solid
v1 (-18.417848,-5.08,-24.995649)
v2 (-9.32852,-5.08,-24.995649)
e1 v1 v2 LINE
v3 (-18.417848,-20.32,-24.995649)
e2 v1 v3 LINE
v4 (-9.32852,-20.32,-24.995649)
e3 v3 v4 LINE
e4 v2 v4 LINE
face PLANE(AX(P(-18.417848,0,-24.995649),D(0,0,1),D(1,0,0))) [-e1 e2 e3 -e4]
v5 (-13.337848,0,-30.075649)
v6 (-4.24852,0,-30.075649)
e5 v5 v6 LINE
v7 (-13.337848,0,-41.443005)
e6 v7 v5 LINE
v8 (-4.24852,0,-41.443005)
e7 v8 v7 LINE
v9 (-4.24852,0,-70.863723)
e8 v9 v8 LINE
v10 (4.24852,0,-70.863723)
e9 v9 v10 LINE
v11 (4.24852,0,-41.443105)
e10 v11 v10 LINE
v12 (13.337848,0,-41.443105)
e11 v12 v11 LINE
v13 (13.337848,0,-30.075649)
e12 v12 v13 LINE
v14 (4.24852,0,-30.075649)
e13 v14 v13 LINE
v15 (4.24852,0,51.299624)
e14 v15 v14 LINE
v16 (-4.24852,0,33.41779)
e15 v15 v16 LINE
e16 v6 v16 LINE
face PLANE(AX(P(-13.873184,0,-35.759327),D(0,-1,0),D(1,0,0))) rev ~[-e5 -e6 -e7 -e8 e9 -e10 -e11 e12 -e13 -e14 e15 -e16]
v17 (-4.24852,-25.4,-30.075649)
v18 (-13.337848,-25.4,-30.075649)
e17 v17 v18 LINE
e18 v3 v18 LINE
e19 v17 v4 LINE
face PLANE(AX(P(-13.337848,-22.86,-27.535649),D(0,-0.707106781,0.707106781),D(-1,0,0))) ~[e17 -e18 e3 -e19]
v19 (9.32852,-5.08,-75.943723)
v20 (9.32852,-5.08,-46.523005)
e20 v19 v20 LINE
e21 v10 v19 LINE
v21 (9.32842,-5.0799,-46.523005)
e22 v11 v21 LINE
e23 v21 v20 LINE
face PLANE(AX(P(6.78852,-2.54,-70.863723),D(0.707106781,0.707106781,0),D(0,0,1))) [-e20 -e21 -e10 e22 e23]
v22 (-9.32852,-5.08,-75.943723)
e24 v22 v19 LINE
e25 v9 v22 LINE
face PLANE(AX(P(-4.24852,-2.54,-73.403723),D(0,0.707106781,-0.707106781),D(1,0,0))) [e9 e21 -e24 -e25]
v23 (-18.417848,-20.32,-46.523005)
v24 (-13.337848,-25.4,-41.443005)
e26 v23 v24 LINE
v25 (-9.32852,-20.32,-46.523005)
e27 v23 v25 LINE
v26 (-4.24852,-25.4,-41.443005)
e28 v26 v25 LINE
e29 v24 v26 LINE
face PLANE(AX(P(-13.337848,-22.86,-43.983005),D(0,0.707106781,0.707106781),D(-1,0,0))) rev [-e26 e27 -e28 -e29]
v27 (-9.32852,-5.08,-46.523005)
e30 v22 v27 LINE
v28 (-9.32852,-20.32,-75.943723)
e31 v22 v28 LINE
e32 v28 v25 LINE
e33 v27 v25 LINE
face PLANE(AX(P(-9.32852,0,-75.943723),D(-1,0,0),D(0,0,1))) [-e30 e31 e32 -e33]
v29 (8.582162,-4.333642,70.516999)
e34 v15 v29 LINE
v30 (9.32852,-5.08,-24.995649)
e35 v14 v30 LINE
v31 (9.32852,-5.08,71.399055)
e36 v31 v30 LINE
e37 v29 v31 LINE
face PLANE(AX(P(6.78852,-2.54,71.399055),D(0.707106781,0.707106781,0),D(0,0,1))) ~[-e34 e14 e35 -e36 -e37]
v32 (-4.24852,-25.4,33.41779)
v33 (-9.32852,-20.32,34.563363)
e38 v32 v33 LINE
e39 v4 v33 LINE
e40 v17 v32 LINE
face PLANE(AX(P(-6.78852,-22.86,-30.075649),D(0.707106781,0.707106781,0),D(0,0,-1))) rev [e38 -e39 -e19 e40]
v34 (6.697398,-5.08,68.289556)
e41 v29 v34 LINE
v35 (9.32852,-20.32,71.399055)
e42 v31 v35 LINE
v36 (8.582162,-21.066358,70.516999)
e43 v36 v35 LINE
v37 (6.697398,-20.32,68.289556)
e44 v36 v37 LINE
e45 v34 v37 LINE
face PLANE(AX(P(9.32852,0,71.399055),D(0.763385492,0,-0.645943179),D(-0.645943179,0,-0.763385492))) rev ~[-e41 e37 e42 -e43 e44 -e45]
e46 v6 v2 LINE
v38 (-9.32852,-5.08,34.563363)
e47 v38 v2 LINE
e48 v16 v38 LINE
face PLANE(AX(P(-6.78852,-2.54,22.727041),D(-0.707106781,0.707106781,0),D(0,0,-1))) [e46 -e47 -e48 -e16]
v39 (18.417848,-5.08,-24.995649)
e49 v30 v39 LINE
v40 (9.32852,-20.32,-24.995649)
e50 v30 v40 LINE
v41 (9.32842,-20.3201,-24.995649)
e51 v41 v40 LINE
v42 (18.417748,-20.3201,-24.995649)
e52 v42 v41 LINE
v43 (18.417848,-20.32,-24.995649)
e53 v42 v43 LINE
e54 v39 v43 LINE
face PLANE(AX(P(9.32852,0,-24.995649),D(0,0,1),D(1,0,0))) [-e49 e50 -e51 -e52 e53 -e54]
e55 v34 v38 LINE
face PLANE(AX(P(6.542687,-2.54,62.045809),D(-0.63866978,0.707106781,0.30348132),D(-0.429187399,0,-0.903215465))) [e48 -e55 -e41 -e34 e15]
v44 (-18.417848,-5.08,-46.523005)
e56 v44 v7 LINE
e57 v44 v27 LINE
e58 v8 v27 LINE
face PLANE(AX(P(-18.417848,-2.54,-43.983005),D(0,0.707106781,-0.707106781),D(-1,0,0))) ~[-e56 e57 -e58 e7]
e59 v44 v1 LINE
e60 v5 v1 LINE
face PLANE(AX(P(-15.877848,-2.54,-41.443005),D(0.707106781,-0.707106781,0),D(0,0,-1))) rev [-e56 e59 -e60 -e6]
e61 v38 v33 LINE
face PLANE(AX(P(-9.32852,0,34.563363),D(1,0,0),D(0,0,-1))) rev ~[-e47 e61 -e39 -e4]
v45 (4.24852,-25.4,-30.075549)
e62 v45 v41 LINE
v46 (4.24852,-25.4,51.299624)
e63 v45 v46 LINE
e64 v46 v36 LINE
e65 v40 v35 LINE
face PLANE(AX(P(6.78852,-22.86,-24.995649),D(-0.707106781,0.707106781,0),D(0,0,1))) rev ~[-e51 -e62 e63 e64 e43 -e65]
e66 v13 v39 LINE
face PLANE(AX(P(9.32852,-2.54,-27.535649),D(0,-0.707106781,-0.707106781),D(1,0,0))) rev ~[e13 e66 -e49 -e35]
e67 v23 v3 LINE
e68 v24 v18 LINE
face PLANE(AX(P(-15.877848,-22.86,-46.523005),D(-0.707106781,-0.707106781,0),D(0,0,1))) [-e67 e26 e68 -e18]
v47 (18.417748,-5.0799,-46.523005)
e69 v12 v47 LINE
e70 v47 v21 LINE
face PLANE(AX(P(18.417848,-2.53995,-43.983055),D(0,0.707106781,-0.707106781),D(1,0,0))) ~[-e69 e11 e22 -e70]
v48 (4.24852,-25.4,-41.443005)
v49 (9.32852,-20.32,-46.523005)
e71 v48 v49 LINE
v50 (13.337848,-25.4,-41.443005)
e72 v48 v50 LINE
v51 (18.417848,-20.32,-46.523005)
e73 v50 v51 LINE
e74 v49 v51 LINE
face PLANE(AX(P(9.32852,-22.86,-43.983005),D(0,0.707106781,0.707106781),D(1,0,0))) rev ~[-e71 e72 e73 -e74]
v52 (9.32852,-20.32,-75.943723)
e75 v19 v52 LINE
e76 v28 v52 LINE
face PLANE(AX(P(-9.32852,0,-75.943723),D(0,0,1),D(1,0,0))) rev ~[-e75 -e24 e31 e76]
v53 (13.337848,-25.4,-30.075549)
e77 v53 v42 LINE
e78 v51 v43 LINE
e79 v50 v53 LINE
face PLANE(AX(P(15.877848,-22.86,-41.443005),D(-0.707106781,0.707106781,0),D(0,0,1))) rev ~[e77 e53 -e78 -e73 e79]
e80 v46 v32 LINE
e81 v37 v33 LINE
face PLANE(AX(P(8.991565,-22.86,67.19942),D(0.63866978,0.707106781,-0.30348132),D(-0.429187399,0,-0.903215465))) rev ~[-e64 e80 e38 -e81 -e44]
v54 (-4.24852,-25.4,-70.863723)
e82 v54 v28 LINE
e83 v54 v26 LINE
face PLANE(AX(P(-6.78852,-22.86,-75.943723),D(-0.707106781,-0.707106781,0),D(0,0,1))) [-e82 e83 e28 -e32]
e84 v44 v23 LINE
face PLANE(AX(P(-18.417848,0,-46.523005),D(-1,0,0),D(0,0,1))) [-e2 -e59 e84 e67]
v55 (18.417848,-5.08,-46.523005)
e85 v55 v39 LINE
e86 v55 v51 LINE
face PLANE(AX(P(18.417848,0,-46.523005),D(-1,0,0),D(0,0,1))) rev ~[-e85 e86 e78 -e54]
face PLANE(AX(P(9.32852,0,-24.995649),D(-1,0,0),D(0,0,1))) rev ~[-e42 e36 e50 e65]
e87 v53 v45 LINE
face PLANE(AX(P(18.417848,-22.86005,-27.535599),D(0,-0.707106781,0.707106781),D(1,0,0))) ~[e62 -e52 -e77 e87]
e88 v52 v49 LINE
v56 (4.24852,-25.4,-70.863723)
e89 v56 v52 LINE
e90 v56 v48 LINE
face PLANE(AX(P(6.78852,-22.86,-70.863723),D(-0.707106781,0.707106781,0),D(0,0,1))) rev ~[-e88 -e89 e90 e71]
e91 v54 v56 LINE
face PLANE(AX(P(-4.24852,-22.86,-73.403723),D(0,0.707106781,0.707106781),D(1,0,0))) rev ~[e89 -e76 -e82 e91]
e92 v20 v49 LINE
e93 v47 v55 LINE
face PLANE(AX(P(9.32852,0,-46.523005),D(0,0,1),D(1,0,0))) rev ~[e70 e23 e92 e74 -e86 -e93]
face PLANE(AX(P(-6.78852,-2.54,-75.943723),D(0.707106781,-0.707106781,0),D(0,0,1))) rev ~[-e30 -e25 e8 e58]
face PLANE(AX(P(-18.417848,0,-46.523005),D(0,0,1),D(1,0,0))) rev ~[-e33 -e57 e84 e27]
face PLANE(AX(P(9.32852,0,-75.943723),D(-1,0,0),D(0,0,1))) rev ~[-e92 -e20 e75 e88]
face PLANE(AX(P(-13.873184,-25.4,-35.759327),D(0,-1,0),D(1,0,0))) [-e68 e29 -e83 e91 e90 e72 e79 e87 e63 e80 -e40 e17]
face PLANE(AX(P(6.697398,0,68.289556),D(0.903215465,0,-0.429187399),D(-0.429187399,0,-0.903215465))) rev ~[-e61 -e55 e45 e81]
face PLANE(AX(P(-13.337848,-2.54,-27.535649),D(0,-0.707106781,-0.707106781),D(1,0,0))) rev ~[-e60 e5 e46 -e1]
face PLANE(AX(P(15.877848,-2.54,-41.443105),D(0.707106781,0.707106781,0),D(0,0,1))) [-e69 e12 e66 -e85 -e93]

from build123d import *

# Parameters (mm, degrees)
F0_W        = 9.0893283486
F0_H        = 21.5273555368
F0_W_2      = 9.3285199255
F0_H_2      = 29.4207185507
F1_DEPTH    = 25.4
F2_R        = 9.5587418967
F3_DEPTH    = 25.4
F4_C1_SIZE  = 5.08
F4_C2_SIZE  = 5.08
F4_C3_SIZE  = 5.08
F4_C4_SIZE  = 5.08
F4_C5_SIZE  = 5.08
F4_C6_SIZE  = 5.0799
F4_C7_SIZE  = 5.08
F4_C8_SIZE  = 5.08
F4_C9_SIZE  = 5.08
F4_C10_SIZE = 5.08
F4_C11_SIZE = 5.08
F4_C12_SIZE = 5.08
F5_C1_SIZE  = 5.08
F5_C2_SIZE  = 5.08
F5_C3_SIZE  = 5.08
F5_C4_SIZE  = 5.08
F5_C5_SIZE  = 5.08
F5_C6_SIZE  = 5.08
F5_C7_SIZE  = 5.08
F5_C8_SIZE  = 5.08
F5_C9_SIZE  = 5.08
F5_C10_SIZE = 5.08
F5_C11_SIZE = 5.0799
F5_C12_SIZE = 5.08


# Not quite as in the source:
# - a fillet or chamfer is up to 0.001 mm smaller than in the source, because OpenCascade refuses the exact size


with BuildPart() as f1:
    # F0 (on Front) → F1 (new body)
    with BuildSketch(Plane.XZ):
        with Locations((-13.8731840998, -35.7593270019)):
            Rectangle(F0_W, F0_H)
        Polygon((-9.3285199255, -24.9956492335), (-9.3285199255, -46.5230047703), (0, -46.5230047703), (9.3285199255, -46.5230047703), (9.3285199255, -24.9956492335), (9.3285199255, 34.5633625984), (9.3285199255, 71.3990554214), (6.6973981448, 68.2895556092), (-9.3285199255, 34.5633625984), align=None)
        with Locations((13.8731840998, -35.7593270019)):
            Rectangle(F0_W, F0_H)
        with Locations((-4.6642599627, -61.2333640456)):
            Rectangle(F0_W_2, F0_H_2)
        with Locations((4.6642599627, -61.2333640456)):
            Rectangle(F0_W_2, F0_H_2)
    extrude(amount=F1_DEPTH)

    # F2 (on Front) → F3 (join)
    with BuildSketch(Plane.XZ):
        with Locations((0, -37.1944867074)):
            Circle(F2_R)
    extrude(amount=F3_DEPTH)

    # F4: chamfer of 5.08 on 13 edges, made by hand

    # F4_c1
    f4_c1_edges = [f1.edges().sort_by_distance(p)[0] for p in [
        (-13.8731840998, 0, -46.5230047703),
    ]]
    chamfer(f4_c1_edges, length=F4_C1_SIZE)

    # F4_c2
    f4_c2_edges = [f1.edges().sort_by_distance(p)[0] for p in [
        (-18.4178482741, 0, -33.2193270019),
    ]]
    chamfer(f4_c2_edges, length=F4_C2_SIZE)

    # F4_c3
    f4_c3_edges = [f1.edges().sort_by_distance(p)[0] for p in [
        (-9.3285199255, 0, -61.2333640456),
    ]]
    chamfer(f4_c3_edges, length=F4_C3_SIZE)

    # F4_c4
    f4_c4_edges = [f1.edges().sort_by_distance(p)[0] for p in [
        (2.54, 0, -75.943723321),
    ]]
    chamfer(f4_c4_edges, length=F4_C4_SIZE)

    # F4_c5
    f4_c5_edges = [f1.edges().sort_by_distance(p)[0] for p in [
        (9.3285199255, 0, -58.6933640456),
    ]]
    chamfer(f4_c5_edges, length=F4_C5_SIZE)

    # F4_c6 (size 5.08 in the source; OpenCascade refuses exactly that, so slightly less here)
    f4_c6_edges = [f1.edges().sort_by_distance(p)[0] for p in [
        (13.8731840998, 0, -46.5230047703),
    ]]
    chamfer(f4_c6_edges, length=F4_C6_SIZE)

    # F4_c7
    f4_c7_edges = [f1.edges().sort_by_distance(p)[0] for p in [
        (18.4178482741, 0, -33.2193770019),
    ]]
    chamfer(f4_c7_edges, length=F4_C7_SIZE)

    # F4_c8
    f4_c8_edges = [f1.edges().sort_by_distance(p)[0] for p in [
        (11.3331840998, 0, -24.9956492335),
    ]]
    chamfer(f4_c8_edges, length=F4_C8_SIZE)

    # F4_c9
    f4_c9_edges = [f1.edges().sort_by_distance(p)[0] for p in [
        (9.3285199255, 0, 23.2017030939),
    ]]
    chamfer(f4_c9_edges, length=F4_C9_SIZE)

    # F4_c10
    f4_c10_edges = [f1.edges().sort_by_distance(p)[0] for p in [
        (-2.54, 0, 48.8496538587),
    ]]
    chamfer(f4_c10_edges, length=F4_C10_SIZE)

    # F4_c11
    f4_c11_edges = [f1.edges().sort_by_distance(p)[0] for p in [
        (-9.3285199255, 0, -1.1343040268),
    ]]
    chamfer(f4_c11_edges, length=F4_C11_SIZE)

    # F4_c12
    f4_c12_edges = [f1.edges().sort_by_distance(p)[0] for p in [
        (-11.3331840998, 0, -24.9956492335),
    ]]
    chamfer(f4_c12_edges, length=F4_C12_SIZE)

    # F5: chamfer of 5.08 on 13 edges, made by hand

    # F5_c1
    f5_c1_edges = [f1.edges().sort_by_distance(p)[0] for p in [
        (-18.4178482741, -25.4, -35.7593270019),
    ]]
    chamfer(f5_c1_edges, length=F5_C1_SIZE)

    # F5_c2
    f5_c2_edges = [f1.edges().sort_by_distance(p)[0] for p in [
        (-11.3331840998, -25.4, -24.9956492335),
    ]]
    chamfer(f5_c2_edges, length=F5_C2_SIZE)

    # F5_c3
    f5_c3_edges = [f1.edges().sort_by_distance(p)[0] for p in [
        (-11.3331840998, -25.4, -46.5230047703),
    ]]
    chamfer(f5_c3_edges, length=F5_C3_SIZE)

    # F5_c4
    f5_c4_edges = [f1.edges().sort_by_distance(p)[0] for p in [
        (-9.3285199255, -25.4, 4.7838566825),
    ]]
    chamfer(f5_c4_edges, length=F5_C4_SIZE)

    # F5_c5
    f5_c5_edges = [f1.edges().sort_by_distance(p)[0] for p in [
        (-9.3285199255, -25.4, -61.2333640456),
    ]]
    chamfer(f5_c5_edges, length=F5_C5_SIZE)

    # F5_c6
    f5_c6_edges = [f1.edges().sort_by_distance(p)[0] for p in [
        (1.2244391096, -25.4, 56.7718333827),
    ]]
    chamfer(f5_c6_edges, length=F5_C6_SIZE)

    # F5_c7
    f5_c7_edges = [f1.edges().sort_by_distance(p)[0] for p in [
        (2.54, -25.4, -75.943723321),
    ]]
    chamfer(f5_c7_edges, length=F5_C7_SIZE)

    # F5_c8
    f5_c8_edges = [f1.edges().sort_by_distance(p)[0] for p in [
        (9.3285199255, -25.4, 18.4973615123),
    ]]
    chamfer(f5_c8_edges, length=F5_C8_SIZE)

    # F5_c9
    f5_c9_edges = [f1.edges().sort_by_distance(p)[0] for p in [
        (13.8731840998, -25.4, -46.5230047703),
    ]]
    chamfer(f5_c9_edges, length=F5_C9_SIZE)

    # F5_c10
    f5_c10_edges = [f1.edges().sort_by_distance(p)[0] for p in [
        (9.3285199255, -25.4, -58.6933640456),
    ]]
    chamfer(f5_c10_edges, length=F5_C10_SIZE)

    # F5_c11 (size 5.08 in the source; OpenCascade refuses exactly that, so slightly less here)
    f5_c11_edges = [f1.edges().sort_by_distance(p)[0] for p in [
        (13.8731840998, -25.4, -24.9956492335),
    ]]
    chamfer(f5_c11_edges, length=F5_C11_SIZE)

    # F5_c12
    f5_c12_edges = [f1.edges().sort_by_distance(p)[0] for p in [
        (18.4178482741, -25.4, -35.7592770019),
    ]]
    chamfer(f5_c12_edges, length=F5_C12_SIZE)


solid = f1.part
